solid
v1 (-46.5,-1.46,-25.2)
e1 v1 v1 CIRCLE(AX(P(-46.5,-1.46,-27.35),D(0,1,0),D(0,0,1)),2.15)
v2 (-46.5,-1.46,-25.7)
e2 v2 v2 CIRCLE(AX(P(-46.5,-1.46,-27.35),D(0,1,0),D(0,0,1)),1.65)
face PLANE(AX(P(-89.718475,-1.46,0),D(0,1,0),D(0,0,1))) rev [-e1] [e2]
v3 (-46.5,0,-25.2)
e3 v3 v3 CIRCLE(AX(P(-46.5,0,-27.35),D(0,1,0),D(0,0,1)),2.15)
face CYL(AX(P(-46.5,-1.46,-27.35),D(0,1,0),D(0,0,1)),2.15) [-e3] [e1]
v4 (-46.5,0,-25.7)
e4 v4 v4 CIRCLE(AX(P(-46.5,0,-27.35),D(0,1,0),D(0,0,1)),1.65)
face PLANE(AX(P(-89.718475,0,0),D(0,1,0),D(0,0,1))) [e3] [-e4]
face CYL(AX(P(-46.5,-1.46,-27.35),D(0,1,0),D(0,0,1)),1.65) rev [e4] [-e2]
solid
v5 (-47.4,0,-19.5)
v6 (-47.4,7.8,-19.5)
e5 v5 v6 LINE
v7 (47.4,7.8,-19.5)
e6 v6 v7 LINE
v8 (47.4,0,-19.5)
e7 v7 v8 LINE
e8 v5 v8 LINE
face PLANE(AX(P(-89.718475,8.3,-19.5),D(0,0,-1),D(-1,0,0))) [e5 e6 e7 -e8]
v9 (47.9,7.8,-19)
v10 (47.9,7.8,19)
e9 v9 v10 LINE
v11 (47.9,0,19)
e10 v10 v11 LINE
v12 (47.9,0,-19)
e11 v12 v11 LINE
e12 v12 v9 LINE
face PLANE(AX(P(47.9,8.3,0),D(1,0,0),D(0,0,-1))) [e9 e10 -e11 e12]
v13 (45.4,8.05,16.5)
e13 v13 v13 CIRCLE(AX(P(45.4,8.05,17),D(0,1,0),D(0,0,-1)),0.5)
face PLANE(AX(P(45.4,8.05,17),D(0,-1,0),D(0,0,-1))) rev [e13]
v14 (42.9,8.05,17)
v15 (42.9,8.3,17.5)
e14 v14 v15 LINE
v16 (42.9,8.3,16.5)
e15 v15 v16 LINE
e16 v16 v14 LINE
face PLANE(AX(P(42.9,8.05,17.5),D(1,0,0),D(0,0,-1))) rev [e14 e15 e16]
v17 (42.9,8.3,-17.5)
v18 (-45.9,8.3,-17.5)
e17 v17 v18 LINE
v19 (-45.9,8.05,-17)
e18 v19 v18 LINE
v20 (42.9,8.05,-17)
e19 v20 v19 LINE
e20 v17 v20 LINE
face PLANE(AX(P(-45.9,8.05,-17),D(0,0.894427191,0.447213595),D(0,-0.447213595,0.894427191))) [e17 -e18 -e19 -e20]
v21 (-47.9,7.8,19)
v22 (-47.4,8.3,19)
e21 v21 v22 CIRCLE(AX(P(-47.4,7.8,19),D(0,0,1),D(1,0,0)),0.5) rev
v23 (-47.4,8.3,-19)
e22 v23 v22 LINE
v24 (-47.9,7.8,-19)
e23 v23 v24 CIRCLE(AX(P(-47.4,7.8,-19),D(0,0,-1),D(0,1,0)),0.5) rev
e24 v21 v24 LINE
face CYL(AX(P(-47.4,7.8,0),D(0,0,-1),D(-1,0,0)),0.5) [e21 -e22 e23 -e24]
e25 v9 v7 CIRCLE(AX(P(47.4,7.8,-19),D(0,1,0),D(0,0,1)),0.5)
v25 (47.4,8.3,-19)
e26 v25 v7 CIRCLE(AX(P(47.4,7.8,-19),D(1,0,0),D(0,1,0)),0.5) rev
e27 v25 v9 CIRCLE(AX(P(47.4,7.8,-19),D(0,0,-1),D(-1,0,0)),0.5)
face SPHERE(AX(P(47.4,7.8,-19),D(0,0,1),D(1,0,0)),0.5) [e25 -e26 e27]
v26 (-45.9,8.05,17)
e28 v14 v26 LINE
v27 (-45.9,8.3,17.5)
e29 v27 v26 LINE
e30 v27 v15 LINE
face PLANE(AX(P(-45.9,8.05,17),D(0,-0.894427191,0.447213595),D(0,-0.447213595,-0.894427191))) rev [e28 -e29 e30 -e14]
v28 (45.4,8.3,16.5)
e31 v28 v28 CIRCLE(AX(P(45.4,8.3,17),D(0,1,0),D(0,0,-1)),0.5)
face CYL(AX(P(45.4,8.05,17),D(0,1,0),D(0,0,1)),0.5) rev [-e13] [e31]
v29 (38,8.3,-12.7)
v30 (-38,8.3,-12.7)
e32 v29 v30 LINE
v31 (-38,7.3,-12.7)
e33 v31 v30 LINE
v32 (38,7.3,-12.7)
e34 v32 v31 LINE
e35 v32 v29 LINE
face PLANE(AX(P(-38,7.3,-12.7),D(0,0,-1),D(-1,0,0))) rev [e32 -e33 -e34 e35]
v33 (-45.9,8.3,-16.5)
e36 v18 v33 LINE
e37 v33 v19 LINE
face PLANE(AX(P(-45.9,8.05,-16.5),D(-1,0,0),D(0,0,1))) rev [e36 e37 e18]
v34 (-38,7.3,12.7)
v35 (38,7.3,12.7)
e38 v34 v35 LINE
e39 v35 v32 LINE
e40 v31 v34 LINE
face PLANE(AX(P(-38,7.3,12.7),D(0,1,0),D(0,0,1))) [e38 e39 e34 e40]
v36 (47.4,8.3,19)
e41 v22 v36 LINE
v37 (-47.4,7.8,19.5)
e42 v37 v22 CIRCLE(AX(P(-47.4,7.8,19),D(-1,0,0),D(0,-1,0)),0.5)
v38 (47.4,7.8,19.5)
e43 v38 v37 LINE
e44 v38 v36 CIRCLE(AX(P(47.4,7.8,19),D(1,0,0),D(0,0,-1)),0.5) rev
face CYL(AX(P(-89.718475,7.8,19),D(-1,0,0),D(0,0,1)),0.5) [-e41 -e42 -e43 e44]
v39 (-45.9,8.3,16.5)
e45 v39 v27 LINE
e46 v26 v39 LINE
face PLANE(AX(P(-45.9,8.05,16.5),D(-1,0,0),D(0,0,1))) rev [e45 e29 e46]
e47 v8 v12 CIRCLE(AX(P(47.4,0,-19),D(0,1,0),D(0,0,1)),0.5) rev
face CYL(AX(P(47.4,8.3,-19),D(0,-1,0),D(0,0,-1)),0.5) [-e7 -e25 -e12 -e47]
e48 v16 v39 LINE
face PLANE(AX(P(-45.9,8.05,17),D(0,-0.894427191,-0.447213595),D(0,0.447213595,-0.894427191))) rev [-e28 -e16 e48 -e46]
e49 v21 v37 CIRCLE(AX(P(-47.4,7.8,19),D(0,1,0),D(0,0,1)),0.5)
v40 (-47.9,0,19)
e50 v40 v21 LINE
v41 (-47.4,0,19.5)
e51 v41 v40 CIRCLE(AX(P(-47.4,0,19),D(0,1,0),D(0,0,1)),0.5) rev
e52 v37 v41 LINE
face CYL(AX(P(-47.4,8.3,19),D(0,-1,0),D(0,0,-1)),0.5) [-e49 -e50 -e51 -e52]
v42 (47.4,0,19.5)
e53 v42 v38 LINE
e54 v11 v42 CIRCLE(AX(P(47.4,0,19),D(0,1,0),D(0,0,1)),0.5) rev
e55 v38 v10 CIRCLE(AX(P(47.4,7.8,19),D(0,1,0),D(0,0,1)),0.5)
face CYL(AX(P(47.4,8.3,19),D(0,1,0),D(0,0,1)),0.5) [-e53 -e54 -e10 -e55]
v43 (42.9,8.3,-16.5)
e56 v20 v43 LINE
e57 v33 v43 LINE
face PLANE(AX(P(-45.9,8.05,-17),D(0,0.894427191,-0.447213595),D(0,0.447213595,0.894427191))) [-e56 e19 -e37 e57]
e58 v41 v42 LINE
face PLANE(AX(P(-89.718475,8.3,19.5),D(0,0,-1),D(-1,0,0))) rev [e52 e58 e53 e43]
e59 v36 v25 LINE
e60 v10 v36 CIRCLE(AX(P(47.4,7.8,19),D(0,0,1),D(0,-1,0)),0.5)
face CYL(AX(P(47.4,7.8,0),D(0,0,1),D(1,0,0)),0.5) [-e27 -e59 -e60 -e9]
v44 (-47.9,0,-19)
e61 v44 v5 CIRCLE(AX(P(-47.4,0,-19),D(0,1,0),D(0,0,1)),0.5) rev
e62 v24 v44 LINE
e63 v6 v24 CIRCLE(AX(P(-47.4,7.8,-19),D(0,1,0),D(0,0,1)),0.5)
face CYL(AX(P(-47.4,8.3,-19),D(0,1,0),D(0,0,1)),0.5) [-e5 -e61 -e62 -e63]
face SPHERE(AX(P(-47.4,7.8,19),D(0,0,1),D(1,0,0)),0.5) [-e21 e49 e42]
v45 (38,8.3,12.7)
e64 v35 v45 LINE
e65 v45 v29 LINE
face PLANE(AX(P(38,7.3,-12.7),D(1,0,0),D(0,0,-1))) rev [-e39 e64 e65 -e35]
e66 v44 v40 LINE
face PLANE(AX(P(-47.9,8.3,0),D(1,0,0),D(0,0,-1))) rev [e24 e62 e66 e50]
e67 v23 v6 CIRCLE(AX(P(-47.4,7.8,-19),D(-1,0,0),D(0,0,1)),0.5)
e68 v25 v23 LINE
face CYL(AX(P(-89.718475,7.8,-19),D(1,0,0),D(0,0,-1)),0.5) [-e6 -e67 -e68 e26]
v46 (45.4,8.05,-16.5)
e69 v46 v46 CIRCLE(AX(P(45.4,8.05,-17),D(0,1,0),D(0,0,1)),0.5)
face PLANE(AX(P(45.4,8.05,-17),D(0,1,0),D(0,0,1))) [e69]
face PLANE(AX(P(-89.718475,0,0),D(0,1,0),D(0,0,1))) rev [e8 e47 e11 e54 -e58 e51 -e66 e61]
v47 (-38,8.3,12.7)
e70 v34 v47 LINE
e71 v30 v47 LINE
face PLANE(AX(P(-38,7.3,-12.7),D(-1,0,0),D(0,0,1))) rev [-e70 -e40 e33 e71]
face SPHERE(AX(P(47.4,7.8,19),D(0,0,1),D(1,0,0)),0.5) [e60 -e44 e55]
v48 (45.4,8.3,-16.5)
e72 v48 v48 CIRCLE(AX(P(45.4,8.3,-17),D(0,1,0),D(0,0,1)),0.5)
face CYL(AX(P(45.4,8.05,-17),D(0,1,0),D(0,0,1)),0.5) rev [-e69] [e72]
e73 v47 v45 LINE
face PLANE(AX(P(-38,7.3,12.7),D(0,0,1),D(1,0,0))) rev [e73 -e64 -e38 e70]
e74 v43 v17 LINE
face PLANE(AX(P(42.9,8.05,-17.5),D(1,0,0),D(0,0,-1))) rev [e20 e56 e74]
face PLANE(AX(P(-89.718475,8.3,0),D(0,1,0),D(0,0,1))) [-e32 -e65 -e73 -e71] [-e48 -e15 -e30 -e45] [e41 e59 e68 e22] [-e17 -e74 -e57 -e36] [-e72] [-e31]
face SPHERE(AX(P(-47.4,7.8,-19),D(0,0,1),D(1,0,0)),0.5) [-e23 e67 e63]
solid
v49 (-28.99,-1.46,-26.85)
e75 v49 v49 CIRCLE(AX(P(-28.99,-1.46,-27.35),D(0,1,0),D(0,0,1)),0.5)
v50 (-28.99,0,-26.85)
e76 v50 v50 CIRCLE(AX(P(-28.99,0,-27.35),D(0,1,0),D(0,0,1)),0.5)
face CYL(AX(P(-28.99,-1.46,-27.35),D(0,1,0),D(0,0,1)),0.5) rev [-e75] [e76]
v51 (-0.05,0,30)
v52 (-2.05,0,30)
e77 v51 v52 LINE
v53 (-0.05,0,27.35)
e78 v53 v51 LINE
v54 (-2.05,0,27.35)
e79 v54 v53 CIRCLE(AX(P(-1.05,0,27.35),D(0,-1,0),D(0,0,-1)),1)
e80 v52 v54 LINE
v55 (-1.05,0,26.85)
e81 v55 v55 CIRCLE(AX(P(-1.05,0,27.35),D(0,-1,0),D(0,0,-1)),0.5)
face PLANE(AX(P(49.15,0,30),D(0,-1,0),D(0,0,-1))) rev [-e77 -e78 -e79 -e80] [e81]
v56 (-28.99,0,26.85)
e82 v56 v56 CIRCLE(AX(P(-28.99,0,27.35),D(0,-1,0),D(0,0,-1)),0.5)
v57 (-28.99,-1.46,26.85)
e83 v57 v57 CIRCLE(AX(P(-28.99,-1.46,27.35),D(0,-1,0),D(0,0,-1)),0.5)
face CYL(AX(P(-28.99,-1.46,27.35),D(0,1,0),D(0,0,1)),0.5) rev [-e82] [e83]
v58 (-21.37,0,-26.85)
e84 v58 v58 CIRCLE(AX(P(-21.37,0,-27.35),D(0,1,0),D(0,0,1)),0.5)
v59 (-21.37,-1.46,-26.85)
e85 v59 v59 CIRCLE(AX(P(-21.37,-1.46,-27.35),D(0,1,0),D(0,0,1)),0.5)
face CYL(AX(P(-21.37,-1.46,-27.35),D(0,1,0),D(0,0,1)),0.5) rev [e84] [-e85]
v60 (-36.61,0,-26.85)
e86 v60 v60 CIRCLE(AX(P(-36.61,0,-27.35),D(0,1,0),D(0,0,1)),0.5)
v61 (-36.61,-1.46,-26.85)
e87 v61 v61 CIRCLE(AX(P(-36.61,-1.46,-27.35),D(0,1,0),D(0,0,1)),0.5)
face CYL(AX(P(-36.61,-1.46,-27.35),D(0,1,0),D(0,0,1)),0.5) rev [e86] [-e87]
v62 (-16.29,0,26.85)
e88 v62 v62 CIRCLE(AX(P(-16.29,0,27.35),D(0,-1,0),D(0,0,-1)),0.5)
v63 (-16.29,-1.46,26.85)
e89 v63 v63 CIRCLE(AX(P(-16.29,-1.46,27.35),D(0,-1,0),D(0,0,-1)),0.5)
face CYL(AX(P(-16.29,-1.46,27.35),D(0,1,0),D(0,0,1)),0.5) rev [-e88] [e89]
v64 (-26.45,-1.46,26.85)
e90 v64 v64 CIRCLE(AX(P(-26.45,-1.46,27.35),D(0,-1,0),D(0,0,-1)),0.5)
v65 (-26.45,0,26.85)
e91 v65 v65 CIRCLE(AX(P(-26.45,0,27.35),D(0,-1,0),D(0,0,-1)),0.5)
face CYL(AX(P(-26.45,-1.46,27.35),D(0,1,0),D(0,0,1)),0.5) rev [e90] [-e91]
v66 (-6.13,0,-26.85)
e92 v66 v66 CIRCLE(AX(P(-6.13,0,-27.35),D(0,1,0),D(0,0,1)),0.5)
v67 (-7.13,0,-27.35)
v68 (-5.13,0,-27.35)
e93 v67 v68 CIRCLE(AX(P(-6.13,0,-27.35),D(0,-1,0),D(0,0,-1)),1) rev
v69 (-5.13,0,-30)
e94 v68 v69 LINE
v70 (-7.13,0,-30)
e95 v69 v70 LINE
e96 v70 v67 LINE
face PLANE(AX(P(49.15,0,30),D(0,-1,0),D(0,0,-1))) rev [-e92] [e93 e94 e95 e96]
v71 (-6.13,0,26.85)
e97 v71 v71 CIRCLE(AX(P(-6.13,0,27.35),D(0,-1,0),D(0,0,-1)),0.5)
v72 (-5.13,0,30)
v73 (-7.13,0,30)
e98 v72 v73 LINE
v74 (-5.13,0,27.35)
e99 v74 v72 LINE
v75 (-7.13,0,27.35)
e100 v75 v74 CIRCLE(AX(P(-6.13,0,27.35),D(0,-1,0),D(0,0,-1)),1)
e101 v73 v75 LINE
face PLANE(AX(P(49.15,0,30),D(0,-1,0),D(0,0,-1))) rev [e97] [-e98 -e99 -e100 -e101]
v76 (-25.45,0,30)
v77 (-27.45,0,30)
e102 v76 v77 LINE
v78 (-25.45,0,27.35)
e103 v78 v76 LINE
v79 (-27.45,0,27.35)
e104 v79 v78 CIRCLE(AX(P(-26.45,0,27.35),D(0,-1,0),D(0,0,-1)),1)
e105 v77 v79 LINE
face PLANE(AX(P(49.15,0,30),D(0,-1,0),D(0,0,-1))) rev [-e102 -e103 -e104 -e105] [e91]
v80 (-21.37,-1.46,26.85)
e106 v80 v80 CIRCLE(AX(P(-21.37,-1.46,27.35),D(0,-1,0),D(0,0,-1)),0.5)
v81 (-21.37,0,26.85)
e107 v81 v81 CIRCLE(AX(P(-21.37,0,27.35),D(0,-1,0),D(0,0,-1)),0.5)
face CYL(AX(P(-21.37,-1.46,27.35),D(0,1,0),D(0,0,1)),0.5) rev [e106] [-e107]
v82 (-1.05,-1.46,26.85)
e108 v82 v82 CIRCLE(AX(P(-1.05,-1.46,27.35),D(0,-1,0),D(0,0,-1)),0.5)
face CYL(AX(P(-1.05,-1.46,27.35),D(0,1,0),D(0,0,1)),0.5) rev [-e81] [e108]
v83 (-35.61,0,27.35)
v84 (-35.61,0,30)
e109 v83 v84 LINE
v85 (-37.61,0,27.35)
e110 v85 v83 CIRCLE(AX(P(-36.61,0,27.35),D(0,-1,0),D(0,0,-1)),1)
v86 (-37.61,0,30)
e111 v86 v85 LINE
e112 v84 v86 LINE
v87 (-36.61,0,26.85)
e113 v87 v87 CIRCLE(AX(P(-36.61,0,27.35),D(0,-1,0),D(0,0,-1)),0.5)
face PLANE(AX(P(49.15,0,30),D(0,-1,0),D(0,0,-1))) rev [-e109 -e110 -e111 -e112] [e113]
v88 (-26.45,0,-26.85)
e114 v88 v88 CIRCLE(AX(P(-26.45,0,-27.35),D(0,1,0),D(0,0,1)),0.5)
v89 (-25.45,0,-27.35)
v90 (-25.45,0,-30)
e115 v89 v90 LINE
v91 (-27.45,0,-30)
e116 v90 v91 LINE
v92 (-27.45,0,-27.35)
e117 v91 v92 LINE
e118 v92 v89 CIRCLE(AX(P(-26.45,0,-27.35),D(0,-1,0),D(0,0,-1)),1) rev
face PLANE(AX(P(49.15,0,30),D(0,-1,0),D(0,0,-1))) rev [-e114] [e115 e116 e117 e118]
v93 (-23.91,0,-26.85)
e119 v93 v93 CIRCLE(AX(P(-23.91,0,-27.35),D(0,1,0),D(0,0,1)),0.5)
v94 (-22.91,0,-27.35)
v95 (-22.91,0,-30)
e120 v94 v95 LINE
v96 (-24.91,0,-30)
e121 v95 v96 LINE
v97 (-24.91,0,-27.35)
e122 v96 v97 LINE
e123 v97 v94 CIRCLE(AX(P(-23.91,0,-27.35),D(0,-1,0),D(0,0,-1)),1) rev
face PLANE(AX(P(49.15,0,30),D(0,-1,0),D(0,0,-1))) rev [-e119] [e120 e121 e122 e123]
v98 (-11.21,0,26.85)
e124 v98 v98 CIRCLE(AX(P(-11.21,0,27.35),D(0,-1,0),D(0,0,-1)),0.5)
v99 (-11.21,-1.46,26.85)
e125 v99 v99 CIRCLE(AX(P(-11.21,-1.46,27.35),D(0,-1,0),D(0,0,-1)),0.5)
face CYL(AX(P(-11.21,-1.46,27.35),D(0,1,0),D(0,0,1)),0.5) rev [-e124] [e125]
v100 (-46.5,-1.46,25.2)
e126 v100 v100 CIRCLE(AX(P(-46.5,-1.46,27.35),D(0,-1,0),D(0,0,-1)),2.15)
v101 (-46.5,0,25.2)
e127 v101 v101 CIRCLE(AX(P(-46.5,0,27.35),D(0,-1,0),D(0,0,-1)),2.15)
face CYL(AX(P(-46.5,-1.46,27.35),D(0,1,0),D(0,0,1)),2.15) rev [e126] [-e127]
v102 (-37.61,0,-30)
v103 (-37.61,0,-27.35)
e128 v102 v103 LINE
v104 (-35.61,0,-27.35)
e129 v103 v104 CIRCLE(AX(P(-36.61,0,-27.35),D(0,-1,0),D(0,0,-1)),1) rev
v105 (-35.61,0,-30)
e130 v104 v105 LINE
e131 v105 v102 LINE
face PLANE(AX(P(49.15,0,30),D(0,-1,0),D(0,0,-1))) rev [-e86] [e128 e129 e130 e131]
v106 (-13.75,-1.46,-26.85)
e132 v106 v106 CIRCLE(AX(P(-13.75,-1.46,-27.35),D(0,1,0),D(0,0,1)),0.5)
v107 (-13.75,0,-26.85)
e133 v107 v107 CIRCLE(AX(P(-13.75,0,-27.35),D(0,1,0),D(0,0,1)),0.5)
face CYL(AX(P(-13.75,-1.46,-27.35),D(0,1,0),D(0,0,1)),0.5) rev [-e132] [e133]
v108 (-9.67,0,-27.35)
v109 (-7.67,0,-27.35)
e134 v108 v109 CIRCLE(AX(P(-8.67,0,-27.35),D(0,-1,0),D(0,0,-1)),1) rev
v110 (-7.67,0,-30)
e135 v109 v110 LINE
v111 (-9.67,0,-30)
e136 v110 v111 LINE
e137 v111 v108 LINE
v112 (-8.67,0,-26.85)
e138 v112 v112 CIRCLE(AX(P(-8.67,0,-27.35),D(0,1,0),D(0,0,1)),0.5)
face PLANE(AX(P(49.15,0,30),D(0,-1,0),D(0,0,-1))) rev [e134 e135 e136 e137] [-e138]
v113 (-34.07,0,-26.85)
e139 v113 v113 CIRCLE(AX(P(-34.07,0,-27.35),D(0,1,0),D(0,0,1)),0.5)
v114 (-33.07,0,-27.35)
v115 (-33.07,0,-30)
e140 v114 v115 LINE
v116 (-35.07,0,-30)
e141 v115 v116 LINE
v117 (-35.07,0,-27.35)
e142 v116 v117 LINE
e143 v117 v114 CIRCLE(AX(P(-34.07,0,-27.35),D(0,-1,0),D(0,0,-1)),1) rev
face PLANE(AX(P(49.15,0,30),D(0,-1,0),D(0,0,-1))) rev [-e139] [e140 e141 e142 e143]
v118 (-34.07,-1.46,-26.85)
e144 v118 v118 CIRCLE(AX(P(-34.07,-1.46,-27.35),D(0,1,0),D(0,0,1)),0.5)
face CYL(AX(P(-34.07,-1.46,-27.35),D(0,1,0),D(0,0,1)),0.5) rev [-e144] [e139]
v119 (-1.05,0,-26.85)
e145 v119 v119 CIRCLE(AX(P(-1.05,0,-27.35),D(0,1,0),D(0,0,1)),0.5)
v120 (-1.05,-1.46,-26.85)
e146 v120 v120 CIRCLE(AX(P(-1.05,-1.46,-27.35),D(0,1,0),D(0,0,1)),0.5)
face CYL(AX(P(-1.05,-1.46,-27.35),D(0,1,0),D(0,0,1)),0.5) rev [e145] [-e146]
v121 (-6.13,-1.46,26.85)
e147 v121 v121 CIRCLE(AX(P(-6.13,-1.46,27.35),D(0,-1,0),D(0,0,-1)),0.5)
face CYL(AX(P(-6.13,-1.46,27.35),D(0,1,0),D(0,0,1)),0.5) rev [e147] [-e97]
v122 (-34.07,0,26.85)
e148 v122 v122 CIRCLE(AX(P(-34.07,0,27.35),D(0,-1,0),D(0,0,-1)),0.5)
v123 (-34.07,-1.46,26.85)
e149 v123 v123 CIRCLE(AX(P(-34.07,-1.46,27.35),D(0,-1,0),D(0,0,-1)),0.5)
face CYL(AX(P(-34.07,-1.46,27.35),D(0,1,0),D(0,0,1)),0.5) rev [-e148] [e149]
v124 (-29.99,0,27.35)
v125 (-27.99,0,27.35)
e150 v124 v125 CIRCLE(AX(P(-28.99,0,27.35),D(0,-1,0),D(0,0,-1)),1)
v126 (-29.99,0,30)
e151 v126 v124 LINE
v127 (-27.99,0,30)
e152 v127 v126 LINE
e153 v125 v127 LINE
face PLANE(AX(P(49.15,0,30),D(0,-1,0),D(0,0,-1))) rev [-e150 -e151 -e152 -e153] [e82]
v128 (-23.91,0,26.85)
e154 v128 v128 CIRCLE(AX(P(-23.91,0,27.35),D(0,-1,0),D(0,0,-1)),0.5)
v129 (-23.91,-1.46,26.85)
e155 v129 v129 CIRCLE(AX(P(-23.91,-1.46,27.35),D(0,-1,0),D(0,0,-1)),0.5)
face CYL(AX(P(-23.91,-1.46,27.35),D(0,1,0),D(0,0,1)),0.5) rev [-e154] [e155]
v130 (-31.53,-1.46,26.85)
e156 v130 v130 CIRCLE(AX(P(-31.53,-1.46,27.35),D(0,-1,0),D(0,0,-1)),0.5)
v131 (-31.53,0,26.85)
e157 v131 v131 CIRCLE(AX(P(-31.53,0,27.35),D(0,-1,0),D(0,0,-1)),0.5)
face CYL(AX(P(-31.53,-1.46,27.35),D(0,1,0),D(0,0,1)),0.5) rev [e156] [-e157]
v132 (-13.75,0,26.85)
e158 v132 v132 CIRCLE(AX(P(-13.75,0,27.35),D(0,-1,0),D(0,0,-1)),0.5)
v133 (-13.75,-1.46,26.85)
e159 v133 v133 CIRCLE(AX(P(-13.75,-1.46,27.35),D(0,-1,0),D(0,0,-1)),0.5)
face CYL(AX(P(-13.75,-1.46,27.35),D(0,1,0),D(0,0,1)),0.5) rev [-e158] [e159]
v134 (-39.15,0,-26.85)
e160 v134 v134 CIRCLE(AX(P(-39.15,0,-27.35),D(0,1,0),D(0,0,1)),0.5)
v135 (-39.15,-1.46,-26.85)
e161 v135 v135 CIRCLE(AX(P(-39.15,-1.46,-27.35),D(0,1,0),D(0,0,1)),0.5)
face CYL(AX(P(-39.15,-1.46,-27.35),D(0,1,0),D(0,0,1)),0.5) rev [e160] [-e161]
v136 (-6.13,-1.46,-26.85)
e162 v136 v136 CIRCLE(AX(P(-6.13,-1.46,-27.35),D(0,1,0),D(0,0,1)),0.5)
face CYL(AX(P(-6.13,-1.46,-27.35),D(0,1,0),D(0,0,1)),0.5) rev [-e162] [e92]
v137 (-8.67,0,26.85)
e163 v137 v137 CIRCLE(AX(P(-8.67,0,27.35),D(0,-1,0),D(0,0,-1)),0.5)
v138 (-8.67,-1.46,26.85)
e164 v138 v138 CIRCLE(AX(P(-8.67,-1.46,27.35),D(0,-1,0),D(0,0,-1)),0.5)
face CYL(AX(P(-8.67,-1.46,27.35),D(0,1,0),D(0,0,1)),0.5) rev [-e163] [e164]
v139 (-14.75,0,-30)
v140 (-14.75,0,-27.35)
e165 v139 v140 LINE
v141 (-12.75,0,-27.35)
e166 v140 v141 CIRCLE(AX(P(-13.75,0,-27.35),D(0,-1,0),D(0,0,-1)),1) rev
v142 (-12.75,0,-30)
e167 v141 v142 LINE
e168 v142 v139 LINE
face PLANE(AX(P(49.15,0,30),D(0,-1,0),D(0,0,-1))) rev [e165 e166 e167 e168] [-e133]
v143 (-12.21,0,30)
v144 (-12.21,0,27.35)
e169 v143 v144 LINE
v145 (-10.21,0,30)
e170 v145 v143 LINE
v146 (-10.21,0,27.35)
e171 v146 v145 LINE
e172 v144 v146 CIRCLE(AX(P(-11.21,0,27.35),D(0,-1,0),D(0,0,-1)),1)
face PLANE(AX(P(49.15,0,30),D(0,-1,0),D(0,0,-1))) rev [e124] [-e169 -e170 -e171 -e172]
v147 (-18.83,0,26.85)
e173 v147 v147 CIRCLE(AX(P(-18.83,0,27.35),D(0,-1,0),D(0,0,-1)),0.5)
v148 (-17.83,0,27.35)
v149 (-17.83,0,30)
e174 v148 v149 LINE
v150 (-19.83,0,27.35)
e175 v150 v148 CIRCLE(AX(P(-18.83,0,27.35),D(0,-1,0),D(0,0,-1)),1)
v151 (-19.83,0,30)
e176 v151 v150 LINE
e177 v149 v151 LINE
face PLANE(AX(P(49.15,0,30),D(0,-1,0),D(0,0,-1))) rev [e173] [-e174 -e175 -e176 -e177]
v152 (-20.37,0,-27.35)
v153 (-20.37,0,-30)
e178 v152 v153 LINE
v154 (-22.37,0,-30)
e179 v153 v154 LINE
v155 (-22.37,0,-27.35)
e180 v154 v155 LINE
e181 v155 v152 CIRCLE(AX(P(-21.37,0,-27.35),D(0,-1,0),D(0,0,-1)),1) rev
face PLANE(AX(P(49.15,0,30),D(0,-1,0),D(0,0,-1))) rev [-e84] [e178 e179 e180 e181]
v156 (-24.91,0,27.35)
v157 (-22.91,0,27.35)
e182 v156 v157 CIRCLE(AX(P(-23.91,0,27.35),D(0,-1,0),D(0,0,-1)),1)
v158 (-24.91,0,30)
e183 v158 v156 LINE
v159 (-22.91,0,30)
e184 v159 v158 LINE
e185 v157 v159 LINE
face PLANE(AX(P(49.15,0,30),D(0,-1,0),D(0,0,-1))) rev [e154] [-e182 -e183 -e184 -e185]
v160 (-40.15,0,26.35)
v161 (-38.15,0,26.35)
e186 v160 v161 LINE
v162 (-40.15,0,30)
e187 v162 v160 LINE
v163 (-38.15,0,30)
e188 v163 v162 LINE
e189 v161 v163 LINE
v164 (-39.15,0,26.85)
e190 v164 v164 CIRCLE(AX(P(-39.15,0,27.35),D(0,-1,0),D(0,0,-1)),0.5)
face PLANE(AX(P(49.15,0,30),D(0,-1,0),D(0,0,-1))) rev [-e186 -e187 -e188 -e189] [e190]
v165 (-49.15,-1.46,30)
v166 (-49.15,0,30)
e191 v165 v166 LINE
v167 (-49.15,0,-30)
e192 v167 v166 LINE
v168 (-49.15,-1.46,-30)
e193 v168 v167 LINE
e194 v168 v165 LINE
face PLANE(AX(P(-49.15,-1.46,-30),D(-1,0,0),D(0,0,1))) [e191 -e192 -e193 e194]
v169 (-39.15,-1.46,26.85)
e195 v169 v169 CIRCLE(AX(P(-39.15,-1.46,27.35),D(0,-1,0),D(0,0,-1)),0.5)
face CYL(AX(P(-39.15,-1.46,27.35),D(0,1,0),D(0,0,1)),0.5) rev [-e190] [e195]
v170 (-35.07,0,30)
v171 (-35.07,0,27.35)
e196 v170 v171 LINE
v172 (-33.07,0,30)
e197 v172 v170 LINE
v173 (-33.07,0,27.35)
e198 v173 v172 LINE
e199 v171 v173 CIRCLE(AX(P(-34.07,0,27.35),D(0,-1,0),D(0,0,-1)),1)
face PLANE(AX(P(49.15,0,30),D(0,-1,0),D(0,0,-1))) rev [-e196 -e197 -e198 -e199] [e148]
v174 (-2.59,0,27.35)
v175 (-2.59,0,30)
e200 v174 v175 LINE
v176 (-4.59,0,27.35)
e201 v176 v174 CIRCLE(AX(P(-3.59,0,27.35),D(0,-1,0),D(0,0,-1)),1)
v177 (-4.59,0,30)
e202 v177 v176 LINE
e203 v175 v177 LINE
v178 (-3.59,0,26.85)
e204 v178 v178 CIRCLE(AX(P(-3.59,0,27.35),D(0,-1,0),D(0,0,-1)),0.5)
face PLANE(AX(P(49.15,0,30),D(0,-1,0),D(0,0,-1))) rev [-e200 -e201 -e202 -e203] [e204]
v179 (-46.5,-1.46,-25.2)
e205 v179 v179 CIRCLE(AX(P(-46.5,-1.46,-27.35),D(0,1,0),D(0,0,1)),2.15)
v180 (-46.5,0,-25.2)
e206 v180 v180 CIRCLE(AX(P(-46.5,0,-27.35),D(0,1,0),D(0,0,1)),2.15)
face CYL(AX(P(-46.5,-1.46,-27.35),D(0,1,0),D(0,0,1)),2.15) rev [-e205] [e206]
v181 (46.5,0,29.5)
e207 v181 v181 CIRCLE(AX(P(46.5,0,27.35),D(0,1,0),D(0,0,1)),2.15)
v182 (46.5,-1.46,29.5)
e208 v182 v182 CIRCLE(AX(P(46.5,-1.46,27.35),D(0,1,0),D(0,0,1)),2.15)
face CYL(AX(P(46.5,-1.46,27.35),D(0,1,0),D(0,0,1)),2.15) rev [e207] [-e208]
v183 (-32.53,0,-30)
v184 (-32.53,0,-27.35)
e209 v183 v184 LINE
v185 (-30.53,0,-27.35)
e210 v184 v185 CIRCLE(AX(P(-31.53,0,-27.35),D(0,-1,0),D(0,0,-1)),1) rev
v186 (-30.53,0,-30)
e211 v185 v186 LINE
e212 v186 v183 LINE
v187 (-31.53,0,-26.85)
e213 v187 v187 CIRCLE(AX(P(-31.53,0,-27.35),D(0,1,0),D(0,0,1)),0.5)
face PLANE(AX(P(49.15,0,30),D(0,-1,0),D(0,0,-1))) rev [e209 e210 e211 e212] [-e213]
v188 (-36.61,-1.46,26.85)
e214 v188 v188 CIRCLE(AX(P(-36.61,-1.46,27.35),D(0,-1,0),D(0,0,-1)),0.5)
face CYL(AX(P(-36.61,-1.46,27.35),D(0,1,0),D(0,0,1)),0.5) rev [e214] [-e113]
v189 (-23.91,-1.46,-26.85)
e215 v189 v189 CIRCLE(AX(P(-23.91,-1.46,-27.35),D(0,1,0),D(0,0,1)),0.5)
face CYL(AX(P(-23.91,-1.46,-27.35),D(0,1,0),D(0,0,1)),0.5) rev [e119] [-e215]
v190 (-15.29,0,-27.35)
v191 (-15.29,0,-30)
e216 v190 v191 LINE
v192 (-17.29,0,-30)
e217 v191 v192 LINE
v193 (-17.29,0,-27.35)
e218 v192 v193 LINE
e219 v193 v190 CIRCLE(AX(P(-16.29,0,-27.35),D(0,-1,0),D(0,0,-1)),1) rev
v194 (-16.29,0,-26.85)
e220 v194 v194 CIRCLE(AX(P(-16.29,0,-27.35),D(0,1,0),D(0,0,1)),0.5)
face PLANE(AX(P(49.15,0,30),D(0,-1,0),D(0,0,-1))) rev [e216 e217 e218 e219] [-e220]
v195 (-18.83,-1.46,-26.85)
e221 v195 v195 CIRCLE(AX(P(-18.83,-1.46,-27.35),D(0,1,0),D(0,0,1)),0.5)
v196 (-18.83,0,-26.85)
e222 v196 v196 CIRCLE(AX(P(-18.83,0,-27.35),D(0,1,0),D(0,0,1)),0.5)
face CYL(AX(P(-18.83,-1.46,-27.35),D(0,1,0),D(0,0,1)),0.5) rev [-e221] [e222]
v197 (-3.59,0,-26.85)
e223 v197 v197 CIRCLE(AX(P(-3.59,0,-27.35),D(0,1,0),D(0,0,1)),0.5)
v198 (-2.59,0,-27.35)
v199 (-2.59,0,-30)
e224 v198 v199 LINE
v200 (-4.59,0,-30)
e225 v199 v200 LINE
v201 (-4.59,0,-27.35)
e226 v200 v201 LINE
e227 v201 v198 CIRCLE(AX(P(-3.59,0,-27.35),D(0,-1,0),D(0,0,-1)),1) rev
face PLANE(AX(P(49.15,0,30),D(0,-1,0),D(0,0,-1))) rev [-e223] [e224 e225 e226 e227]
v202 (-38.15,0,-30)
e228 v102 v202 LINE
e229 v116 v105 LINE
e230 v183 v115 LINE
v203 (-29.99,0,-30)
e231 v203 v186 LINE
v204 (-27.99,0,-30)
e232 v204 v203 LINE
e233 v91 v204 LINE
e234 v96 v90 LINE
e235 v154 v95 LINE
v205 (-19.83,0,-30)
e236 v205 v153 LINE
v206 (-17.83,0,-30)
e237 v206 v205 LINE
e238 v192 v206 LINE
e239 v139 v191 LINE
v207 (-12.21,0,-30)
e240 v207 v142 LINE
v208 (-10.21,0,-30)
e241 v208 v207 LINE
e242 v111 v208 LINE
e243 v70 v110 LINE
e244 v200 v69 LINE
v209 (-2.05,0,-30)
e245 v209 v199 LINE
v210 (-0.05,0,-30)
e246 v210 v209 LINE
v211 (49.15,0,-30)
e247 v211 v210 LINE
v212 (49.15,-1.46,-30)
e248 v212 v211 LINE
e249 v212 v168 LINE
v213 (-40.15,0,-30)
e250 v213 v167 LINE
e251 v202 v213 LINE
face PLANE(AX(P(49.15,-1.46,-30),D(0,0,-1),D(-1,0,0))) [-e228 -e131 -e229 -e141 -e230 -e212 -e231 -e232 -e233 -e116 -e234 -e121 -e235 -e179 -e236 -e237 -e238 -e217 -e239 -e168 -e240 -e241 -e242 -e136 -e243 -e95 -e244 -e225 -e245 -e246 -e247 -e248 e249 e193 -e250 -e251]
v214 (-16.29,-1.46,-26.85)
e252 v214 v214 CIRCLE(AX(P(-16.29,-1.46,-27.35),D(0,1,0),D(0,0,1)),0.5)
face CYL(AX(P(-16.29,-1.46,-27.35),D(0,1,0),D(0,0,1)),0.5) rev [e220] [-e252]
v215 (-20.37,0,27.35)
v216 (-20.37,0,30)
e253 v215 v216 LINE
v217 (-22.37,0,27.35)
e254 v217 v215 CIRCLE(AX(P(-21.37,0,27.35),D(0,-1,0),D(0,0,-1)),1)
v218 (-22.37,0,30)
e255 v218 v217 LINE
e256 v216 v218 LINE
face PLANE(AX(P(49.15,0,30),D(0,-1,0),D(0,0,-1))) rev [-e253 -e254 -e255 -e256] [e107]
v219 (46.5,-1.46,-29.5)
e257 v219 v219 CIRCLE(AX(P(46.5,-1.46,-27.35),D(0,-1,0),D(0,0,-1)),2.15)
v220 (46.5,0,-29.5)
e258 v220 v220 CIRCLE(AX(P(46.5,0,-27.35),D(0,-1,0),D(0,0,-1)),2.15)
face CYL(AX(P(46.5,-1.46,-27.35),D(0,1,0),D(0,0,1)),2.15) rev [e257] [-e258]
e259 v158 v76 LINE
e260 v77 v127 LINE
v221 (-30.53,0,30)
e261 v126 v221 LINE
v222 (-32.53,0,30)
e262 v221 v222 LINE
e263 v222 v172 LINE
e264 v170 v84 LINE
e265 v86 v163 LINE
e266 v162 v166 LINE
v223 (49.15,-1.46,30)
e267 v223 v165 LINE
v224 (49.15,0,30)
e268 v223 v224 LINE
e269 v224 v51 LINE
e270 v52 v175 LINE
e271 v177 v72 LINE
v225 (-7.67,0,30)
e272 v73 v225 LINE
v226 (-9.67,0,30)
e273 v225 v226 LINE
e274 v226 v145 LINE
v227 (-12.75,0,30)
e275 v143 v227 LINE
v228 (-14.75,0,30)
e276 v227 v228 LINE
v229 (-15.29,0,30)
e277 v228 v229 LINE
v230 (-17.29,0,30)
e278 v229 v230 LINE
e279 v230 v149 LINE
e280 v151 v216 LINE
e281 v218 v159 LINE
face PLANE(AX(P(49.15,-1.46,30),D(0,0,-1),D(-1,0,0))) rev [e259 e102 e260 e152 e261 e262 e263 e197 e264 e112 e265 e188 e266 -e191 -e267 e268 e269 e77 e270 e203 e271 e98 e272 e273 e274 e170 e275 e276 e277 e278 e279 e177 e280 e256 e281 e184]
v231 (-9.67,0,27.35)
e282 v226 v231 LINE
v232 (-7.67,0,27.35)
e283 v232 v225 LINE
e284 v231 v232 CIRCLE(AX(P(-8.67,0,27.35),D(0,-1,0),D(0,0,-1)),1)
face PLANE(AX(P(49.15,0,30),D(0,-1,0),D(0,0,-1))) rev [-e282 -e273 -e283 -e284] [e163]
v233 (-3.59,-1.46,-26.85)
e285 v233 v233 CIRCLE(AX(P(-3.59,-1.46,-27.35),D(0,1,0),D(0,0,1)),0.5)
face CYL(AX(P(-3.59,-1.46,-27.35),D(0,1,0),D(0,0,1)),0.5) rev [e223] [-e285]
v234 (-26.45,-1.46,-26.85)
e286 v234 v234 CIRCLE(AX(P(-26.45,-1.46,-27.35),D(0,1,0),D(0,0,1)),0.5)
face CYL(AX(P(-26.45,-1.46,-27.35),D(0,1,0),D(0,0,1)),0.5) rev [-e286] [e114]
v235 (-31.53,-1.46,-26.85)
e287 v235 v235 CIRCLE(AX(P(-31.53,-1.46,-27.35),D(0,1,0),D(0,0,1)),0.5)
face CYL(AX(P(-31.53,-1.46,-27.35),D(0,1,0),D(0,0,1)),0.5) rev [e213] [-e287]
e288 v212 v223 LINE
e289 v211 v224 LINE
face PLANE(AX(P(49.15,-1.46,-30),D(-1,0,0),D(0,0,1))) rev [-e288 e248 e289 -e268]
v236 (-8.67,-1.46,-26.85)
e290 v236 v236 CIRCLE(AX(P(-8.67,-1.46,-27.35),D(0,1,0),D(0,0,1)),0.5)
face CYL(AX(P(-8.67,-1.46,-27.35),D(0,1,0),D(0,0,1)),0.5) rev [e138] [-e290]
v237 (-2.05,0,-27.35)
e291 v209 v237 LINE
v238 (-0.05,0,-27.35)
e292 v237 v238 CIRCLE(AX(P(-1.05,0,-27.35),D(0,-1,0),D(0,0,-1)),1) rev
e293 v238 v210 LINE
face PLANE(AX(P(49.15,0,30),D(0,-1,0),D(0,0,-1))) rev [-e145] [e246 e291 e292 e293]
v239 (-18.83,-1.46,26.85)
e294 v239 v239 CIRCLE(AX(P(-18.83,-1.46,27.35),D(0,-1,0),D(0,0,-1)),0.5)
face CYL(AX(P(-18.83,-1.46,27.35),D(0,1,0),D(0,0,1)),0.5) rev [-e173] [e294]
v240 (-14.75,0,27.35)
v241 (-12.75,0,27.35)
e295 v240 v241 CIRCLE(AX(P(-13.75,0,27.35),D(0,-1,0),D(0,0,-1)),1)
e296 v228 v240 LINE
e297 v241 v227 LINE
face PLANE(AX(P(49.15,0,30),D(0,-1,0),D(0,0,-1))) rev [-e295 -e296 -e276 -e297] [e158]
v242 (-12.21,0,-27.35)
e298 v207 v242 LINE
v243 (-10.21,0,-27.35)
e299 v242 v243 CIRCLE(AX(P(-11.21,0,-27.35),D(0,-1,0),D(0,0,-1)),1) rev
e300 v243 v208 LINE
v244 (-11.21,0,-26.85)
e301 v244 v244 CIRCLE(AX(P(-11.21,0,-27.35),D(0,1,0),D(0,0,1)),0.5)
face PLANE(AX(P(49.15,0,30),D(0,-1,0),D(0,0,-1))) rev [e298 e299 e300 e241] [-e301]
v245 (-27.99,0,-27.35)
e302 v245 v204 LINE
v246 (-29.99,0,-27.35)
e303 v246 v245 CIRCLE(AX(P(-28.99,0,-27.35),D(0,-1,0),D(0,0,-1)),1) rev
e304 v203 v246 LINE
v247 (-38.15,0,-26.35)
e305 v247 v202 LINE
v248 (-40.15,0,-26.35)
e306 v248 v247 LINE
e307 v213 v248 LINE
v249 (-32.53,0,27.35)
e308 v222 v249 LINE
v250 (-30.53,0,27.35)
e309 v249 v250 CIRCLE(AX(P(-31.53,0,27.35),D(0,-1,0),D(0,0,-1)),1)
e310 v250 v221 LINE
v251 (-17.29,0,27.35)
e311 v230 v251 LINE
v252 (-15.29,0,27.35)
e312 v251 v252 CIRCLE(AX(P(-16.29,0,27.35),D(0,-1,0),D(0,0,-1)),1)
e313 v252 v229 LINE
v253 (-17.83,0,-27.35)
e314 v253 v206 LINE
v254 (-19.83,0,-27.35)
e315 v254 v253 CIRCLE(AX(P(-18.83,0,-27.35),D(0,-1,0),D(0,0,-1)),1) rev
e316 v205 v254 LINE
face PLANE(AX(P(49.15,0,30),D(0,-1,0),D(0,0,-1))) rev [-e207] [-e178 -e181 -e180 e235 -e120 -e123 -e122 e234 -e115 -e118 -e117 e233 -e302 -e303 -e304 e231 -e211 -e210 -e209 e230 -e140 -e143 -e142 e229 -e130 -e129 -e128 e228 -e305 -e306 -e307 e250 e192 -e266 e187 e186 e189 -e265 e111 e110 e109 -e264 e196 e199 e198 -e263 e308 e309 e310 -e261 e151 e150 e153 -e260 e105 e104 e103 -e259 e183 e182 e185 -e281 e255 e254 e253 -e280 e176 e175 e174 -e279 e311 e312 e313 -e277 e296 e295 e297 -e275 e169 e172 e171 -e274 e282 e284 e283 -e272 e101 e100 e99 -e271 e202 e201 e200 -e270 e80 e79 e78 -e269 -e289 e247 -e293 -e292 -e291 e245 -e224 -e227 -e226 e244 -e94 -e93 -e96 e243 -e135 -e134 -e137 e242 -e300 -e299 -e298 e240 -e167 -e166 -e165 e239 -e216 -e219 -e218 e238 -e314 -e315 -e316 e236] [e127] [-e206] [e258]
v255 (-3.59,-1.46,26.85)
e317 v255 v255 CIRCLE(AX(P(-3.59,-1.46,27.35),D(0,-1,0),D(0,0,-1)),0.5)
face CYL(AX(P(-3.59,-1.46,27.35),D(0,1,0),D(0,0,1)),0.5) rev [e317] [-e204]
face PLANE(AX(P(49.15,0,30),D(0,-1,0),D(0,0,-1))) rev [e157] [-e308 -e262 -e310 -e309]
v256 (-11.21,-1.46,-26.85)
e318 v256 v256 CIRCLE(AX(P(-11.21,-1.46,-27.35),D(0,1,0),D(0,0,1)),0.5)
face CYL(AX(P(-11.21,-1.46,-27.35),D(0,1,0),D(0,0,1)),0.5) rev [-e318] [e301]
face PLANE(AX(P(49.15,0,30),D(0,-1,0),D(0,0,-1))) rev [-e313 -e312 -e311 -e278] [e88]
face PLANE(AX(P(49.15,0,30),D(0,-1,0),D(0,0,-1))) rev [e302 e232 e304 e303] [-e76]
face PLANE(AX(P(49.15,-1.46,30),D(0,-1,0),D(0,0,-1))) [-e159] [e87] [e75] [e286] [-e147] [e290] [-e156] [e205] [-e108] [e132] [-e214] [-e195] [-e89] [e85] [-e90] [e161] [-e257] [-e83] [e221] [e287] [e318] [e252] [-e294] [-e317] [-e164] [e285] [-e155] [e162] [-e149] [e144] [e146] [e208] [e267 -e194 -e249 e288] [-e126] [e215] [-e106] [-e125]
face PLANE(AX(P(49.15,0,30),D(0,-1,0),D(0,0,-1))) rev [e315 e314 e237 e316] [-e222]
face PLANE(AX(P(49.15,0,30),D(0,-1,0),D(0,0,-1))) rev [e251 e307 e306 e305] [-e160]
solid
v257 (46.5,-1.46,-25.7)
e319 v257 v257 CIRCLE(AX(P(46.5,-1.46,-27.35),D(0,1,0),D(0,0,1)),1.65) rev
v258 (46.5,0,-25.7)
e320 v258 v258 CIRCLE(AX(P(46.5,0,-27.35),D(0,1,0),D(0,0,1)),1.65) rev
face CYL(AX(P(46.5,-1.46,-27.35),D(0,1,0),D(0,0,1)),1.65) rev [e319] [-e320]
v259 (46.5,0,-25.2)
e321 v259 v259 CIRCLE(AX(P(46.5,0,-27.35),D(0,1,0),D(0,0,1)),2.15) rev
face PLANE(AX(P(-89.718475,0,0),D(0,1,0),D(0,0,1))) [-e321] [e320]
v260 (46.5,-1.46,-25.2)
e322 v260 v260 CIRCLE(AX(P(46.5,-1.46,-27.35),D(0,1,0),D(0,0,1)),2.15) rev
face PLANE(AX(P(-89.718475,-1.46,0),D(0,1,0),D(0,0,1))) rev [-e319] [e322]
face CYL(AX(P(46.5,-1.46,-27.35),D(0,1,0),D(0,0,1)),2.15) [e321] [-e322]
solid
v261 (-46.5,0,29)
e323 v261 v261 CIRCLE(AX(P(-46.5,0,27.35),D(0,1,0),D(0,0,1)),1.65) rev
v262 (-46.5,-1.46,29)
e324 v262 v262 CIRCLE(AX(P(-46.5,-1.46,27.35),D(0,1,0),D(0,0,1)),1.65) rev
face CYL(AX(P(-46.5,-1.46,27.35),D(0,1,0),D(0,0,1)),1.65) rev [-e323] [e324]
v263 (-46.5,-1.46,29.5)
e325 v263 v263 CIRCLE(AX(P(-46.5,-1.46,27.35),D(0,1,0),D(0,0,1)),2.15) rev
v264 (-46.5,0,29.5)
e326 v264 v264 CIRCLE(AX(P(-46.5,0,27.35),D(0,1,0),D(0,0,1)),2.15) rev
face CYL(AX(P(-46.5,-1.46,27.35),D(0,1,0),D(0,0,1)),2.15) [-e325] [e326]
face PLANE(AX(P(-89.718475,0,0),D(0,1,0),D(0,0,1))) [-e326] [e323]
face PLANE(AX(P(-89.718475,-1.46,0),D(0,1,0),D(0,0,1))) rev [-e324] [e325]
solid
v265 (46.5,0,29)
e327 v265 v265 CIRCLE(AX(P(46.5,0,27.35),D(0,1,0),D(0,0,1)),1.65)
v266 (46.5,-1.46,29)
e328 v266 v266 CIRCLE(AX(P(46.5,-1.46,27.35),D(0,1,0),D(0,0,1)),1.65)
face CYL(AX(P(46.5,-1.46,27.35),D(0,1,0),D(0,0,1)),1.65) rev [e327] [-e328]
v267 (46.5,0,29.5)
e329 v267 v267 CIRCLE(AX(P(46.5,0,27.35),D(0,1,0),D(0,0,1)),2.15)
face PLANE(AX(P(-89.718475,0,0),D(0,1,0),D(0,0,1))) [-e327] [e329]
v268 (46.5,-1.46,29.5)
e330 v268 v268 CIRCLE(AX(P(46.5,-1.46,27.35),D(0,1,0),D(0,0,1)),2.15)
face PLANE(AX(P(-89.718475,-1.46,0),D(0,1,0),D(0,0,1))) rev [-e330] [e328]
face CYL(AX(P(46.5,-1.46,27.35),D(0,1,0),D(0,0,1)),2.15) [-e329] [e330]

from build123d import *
from OCP.BRepFilletAPI import BRepFilletAPI_MakeChamfer

# Parameters (mm, degrees)
SKETCH1_W             = 98.3
SKETCH1_H             = 60
BOSS_EXTRUDE1_DEPTH   = 1.46
SKETCH1_3_R           = 2.15
CUT_EXTRUDE1_DEPTH    = 58.600816834
SKETCH1_4_R           = 2.15
SKETCH1_4_R_2         = 1.65
BOSS_EXTRUDE2_DEPTH   = 1.46
BOSS_EXTRUDE2_2_DEPTH = 1.46
BOSS_EXTRUDE2_3_DEPTH = 1.46
BOSS_EXTRUDE2_4_DEPTH = 1.46
SKETCH1_5_W           = 95.8
SKETCH1_5_H           = 39
BOSS_EXTRUDE3_DEPTH   = 8.3
SKETCH2_W             = 76
SKETCH2_H             = 25.4
CUT_EXTRUDE2_DEPTH    = 1
SKETCH3_R             = 0.5
SKETCH3_W             = 88.8
SKETCH3_H             = 1
CUT_EXTRUDE3_DEPTH    = 0.25
CHAMFER1_SIZE         = 0.25
CHAMFER1_SIZE_2       = 0.5
FILLET1_R             = 0.5
SKETCH4_7_R           = 0.5
CUT_EXTRUDE9_DEPTH    = 59.177422597


with BuildPart() as part:
    # Sketch1 → Boss-Extrude1 (new body)
    with BuildSketch(Plane(origin=(0, 0, 0), x_dir=(1, 0, 0), z_dir=(0, 1, 0))):
        Rectangle(SKETCH1_W, SKETCH1_H)
    extrude(amount=-BOSS_EXTRUDE1_DEPTH)

    # Sketch1<3> → Cut-Extrude1 (cut, through all)
    with BuildSketch(Plane(origin=(0, 0, 0), x_dir=(1, 0, 0), z_dir=(0, 1, 0))):
        with Locations(Location((-46.5, 27.35, 0), (0, 0, 270))):
            Circle(SKETCH1_3_R)
        with Locations(Location((46.5, 27.35, 0), (0, 0, 90))):
            Circle(SKETCH1_3_R)
        with Locations(Location((46.5, -27.35, 0), (0, 0, 270))):
            Circle(SKETCH1_3_R)
        with Locations(Location((-46.5, -27.35, 0), (0, 0, 90))):
            Circle(SKETCH1_3_R)
    extrude(amount=-CUT_EXTRUDE1_DEPTH, mode=Mode.SUBTRACT)

    # Sketch4<7> → Cut-Extrude9 (cut, through all)
    with BuildSketch(Plane(origin=(0, 0, 0), x_dir=(1, 0, 0), z_dir=(0, 1, 0))):
        with Locations(Location((-39.15, 27.35, 0), (0, 0, 270))):
            Circle(SKETCH4_7_R)
        with Locations(Location((-36.61, 27.35, 0), (0, 0, 270))):
            Circle(SKETCH4_7_R)
        with Locations(Location((-34.07, 27.35, 0), (0, 0, 270))):
            Circle(SKETCH4_7_R)
        with Locations(Location((-31.53, 27.35, 0), (0, 0, 270))):
            Circle(SKETCH4_7_R)
        with Locations(Location((-28.99, 27.35, 0), (0, 0, 270))):
            Circle(SKETCH4_7_R)
        with Locations(Location((-26.45, 27.35, 0), (0, 0, 270))):
            Circle(SKETCH4_7_R)
        with Locations(Location((-23.91, 27.35, 0), (0, 0, 270))):
            Circle(SKETCH4_7_R)
        with Locations(Location((-21.37, 27.35, 0), (0, 0, 270))):
            Circle(SKETCH4_7_R)
        with Locations(Location((-18.83, 27.35, 0), (0, 0, 270))):
            Circle(SKETCH4_7_R)
        with Locations(Location((-16.29, 27.35, 0), (0, 0, 270))):
            Circle(SKETCH4_7_R)
        with Locations(Location((-13.75, 27.35, 0), (0, 0, 270))):
            Circle(SKETCH4_7_R)
        with Locations(Location((-11.21, 27.35, 0), (0, 0, 270))):
            Circle(SKETCH4_7_R)
        with Locations(Location((-8.67, 27.35, 0), (0, 0, 270))):
            Circle(SKETCH4_7_R)
        with Locations(Location((-6.13, 27.35, 0), (0, 0, 270))):
            Circle(SKETCH4_7_R)
        with Locations(Location((-3.59, 27.35, 0), (0, 0, 270))):
            Circle(SKETCH4_7_R)
        with Locations(Location((-1.05, 27.35, 0), (0, 0, 270))):
            Circle(SKETCH4_7_R)
    cut_extrude9 = extrude(amount=-CUT_EXTRUDE9_DEPTH, mode=Mode.SUBTRACT)

    # Mirror1: Cut-Extrude9 across plane
    add(cut_extrude9.mirror(Plane.XY), mode=Mode.SUBTRACT)


with BuildPart() as body_2:
    # Sketch1<4> → Boss-Extrude2 (new body)
    with BuildSketch(Plane(origin=(0, 0, 0), x_dir=(1, 0, 0), z_dir=(0, 1, 0))):
        with Locations(Location((-46.5, 27.35, 0), (0, 0, 270))):
            Circle(SKETCH1_4_R)
        with Locations(Location((-46.5, 27.35, 0), (0, 0, 270))):
            Circle(SKETCH1_4_R_2, mode=Mode.SUBTRACT)
    extrude(amount=-BOSS_EXTRUDE2_DEPTH)


with BuildPart() as body_3:
    # Sketch1<4> → Boss-Extrude2 2 (new body)
    with BuildSketch(Plane(origin=(0, 0, 0), x_dir=(1, 0, 0), z_dir=(0, 1, 0))):
        with Locations(Location((46.5, 27.35, 0), (0, 0, 270))):
            Circle(SKETCH1_4_R)
        with Locations(Location((46.5, 27.35, 0), (0, 0, 270))):
            Circle(SKETCH1_4_R_2, mode=Mode.SUBTRACT)
    extrude(amount=-BOSS_EXTRUDE2_2_DEPTH)


with BuildPart() as body_4:
    # Sketch1<4> → Boss-Extrude2 3 (new body)
    with BuildSketch(Plane(origin=(0, 0, 0), x_dir=(1, 0, 0), z_dir=(0, 1, 0))):
        with Locations(Location((46.5, -27.35, 0), (0, 0, 270))):
            Circle(SKETCH1_4_R)
        with Locations(Location((46.5, -27.35, 0), (0, 0, 270))):
            Circle(SKETCH1_4_R_2, mode=Mode.SUBTRACT)
    extrude(amount=-BOSS_EXTRUDE2_3_DEPTH)


with BuildPart() as body_5:
    # Sketch1<4> → Boss-Extrude2 4 (new body)
    with BuildSketch(Plane(origin=(0, 0, 0), x_dir=(1, 0, 0), z_dir=(0, 1, 0))):
        with Locations(Location((-46.5, -27.35, 0), (0, 0, 270))):
            Circle(SKETCH1_4_R)
        with Locations(Location((-46.5, -27.35, 0), (0, 0, 270))):
            Circle(SKETCH1_4_R_2, mode=Mode.SUBTRACT)
    extrude(amount=-BOSS_EXTRUDE2_4_DEPTH)


with BuildPart() as body_6:
    # Sketch1<5> → Boss-Extrude3 (new body)
    with BuildSketch(Plane(origin=(0, 0, 0), x_dir=(1, 0, 0), z_dir=(0, 1, 0))):
        Rectangle(SKETCH1_5_W, SKETCH1_5_H)
    extrude(amount=BOSS_EXTRUDE3_DEPTH)

    # Sketch2 → Cut-Extrude2 (cut)
    with BuildSketch(Plane(origin=(0, 8.3, 0), x_dir=(-1, 0, 0), z_dir=(0, 1, 0))):
        Rectangle(SKETCH2_W, SKETCH2_H)
    extrude(amount=-CUT_EXTRUDE2_DEPTH, mode=Mode.SUBTRACT)

    # Sketch3 → Cut-Extrude3 (cut)
    with BuildSketch(Plane(origin=(0, 8.3, 0), x_dir=(1, 0, 0), z_dir=(0, 1, 0))):
        with Locations(Location((45.4, 17, 0), (0, 0, 270))):
            Circle(SKETCH3_R)
        with Locations(Location((45.4, -17, 0), (0, 0, 90))):
            Circle(SKETCH3_R)
        with Locations((-1.5, 17)):
            Rectangle(SKETCH3_W, SKETCH3_H)
        with Locations((-1.5, -17)):
            Rectangle(SKETCH3_W, SKETCH3_H)
    extrude(amount=-CUT_EXTRUDE3_DEPTH, mode=Mode.SUBTRACT)

    # Chamfer1
    chamfer1_edges_1 = [body_6.edges().sort_by_distance(p)[0] for p in [
        (-1.5, 8.05, 17.5),
    ]]
    chamfer1_side_1 = [body_6.faces().sort_by_distance(p)[0] for p in [
        (-1.5, 8.055, 17.5),
    ]]
    chamfer1_edges_2 = [body_6.edges().sort_by_distance(p)[0] for p in [
        (-1.5, 8.05, 16.5),
    ]]
    chamfer1_side_2 = [body_6.faces().sort_by_distance(p)[0] for p in [
        (-1.5, 8.055, 16.5),
    ]]
    chamfer1_edges_3 = [body_6.edges().sort_by_distance(p)[0] for p in [
        (-1.5, 8.05, -16.5),
    ]]
    chamfer1_side_3 = [body_6.faces().sort_by_distance(p)[0] for p in [
        (-1.5, 8.055, -16.5),
    ]]
    chamfer1_edges_4 = [body_6.edges().sort_by_distance(p)[0] for p in [
        (-1.5, 8.05, -17.5),
    ]]
    chamfer1_side_4 = [body_6.faces().sort_by_distance(p)[0] for p in [
        (-1.5, 8.055, -17.5),
    ]]
    chamfer1 = BRepFilletAPI_MakeChamfer(body_6.part.solid().wrapped)
    for e in chamfer1_edges_1:
        chamfer1.Add(CHAMFER1_SIZE - 0.0001, CHAMFER1_SIZE_2 - 0.0001, e.wrapped, chamfer1_side_1[0].wrapped)
    for e in chamfer1_edges_2:
        chamfer1.Add(CHAMFER1_SIZE - 0.0001, CHAMFER1_SIZE_2 - 0.0001, e.wrapped, chamfer1_side_2[0].wrapped)
    for e in chamfer1_edges_3:
        chamfer1.Add(CHAMFER1_SIZE - 0.0001, CHAMFER1_SIZE_2 - 0.0001, e.wrapped, chamfer1_side_3[0].wrapped)
    for e in chamfer1_edges_4:
        chamfer1.Add(CHAMFER1_SIZE - 0.0001, CHAMFER1_SIZE_2 - 0.0001, e.wrapped, chamfer1_side_4[0].wrapped)
    add(Compound.cast(chamfer1.Shape()), mode=Mode.REPLACE)  # a hair under: the kernel refuses the full size

    # Fillet1
    fillet1_edges = [body_6.edges().sort_by_distance(p)[0] for p in [
        (-47.9, 8.3, 0),
        (0, 8.3, 19.5),
        (47.9, 8.3, 0),
        (47.9, 4.15, 19.5),
        (-47.9, 4.15, 19.5),
        (-47.9, 4.15, -19.5),
        (47.9, 4.15, -19.5),
        (0, 8.3, -19.5),
    ]]
    fillet(fillet1_edges, radius=FILLET1_R)


solid = Compound([part.part, body_2.part, body_3.part, body_4.part, body_5.part, body_6.part])
